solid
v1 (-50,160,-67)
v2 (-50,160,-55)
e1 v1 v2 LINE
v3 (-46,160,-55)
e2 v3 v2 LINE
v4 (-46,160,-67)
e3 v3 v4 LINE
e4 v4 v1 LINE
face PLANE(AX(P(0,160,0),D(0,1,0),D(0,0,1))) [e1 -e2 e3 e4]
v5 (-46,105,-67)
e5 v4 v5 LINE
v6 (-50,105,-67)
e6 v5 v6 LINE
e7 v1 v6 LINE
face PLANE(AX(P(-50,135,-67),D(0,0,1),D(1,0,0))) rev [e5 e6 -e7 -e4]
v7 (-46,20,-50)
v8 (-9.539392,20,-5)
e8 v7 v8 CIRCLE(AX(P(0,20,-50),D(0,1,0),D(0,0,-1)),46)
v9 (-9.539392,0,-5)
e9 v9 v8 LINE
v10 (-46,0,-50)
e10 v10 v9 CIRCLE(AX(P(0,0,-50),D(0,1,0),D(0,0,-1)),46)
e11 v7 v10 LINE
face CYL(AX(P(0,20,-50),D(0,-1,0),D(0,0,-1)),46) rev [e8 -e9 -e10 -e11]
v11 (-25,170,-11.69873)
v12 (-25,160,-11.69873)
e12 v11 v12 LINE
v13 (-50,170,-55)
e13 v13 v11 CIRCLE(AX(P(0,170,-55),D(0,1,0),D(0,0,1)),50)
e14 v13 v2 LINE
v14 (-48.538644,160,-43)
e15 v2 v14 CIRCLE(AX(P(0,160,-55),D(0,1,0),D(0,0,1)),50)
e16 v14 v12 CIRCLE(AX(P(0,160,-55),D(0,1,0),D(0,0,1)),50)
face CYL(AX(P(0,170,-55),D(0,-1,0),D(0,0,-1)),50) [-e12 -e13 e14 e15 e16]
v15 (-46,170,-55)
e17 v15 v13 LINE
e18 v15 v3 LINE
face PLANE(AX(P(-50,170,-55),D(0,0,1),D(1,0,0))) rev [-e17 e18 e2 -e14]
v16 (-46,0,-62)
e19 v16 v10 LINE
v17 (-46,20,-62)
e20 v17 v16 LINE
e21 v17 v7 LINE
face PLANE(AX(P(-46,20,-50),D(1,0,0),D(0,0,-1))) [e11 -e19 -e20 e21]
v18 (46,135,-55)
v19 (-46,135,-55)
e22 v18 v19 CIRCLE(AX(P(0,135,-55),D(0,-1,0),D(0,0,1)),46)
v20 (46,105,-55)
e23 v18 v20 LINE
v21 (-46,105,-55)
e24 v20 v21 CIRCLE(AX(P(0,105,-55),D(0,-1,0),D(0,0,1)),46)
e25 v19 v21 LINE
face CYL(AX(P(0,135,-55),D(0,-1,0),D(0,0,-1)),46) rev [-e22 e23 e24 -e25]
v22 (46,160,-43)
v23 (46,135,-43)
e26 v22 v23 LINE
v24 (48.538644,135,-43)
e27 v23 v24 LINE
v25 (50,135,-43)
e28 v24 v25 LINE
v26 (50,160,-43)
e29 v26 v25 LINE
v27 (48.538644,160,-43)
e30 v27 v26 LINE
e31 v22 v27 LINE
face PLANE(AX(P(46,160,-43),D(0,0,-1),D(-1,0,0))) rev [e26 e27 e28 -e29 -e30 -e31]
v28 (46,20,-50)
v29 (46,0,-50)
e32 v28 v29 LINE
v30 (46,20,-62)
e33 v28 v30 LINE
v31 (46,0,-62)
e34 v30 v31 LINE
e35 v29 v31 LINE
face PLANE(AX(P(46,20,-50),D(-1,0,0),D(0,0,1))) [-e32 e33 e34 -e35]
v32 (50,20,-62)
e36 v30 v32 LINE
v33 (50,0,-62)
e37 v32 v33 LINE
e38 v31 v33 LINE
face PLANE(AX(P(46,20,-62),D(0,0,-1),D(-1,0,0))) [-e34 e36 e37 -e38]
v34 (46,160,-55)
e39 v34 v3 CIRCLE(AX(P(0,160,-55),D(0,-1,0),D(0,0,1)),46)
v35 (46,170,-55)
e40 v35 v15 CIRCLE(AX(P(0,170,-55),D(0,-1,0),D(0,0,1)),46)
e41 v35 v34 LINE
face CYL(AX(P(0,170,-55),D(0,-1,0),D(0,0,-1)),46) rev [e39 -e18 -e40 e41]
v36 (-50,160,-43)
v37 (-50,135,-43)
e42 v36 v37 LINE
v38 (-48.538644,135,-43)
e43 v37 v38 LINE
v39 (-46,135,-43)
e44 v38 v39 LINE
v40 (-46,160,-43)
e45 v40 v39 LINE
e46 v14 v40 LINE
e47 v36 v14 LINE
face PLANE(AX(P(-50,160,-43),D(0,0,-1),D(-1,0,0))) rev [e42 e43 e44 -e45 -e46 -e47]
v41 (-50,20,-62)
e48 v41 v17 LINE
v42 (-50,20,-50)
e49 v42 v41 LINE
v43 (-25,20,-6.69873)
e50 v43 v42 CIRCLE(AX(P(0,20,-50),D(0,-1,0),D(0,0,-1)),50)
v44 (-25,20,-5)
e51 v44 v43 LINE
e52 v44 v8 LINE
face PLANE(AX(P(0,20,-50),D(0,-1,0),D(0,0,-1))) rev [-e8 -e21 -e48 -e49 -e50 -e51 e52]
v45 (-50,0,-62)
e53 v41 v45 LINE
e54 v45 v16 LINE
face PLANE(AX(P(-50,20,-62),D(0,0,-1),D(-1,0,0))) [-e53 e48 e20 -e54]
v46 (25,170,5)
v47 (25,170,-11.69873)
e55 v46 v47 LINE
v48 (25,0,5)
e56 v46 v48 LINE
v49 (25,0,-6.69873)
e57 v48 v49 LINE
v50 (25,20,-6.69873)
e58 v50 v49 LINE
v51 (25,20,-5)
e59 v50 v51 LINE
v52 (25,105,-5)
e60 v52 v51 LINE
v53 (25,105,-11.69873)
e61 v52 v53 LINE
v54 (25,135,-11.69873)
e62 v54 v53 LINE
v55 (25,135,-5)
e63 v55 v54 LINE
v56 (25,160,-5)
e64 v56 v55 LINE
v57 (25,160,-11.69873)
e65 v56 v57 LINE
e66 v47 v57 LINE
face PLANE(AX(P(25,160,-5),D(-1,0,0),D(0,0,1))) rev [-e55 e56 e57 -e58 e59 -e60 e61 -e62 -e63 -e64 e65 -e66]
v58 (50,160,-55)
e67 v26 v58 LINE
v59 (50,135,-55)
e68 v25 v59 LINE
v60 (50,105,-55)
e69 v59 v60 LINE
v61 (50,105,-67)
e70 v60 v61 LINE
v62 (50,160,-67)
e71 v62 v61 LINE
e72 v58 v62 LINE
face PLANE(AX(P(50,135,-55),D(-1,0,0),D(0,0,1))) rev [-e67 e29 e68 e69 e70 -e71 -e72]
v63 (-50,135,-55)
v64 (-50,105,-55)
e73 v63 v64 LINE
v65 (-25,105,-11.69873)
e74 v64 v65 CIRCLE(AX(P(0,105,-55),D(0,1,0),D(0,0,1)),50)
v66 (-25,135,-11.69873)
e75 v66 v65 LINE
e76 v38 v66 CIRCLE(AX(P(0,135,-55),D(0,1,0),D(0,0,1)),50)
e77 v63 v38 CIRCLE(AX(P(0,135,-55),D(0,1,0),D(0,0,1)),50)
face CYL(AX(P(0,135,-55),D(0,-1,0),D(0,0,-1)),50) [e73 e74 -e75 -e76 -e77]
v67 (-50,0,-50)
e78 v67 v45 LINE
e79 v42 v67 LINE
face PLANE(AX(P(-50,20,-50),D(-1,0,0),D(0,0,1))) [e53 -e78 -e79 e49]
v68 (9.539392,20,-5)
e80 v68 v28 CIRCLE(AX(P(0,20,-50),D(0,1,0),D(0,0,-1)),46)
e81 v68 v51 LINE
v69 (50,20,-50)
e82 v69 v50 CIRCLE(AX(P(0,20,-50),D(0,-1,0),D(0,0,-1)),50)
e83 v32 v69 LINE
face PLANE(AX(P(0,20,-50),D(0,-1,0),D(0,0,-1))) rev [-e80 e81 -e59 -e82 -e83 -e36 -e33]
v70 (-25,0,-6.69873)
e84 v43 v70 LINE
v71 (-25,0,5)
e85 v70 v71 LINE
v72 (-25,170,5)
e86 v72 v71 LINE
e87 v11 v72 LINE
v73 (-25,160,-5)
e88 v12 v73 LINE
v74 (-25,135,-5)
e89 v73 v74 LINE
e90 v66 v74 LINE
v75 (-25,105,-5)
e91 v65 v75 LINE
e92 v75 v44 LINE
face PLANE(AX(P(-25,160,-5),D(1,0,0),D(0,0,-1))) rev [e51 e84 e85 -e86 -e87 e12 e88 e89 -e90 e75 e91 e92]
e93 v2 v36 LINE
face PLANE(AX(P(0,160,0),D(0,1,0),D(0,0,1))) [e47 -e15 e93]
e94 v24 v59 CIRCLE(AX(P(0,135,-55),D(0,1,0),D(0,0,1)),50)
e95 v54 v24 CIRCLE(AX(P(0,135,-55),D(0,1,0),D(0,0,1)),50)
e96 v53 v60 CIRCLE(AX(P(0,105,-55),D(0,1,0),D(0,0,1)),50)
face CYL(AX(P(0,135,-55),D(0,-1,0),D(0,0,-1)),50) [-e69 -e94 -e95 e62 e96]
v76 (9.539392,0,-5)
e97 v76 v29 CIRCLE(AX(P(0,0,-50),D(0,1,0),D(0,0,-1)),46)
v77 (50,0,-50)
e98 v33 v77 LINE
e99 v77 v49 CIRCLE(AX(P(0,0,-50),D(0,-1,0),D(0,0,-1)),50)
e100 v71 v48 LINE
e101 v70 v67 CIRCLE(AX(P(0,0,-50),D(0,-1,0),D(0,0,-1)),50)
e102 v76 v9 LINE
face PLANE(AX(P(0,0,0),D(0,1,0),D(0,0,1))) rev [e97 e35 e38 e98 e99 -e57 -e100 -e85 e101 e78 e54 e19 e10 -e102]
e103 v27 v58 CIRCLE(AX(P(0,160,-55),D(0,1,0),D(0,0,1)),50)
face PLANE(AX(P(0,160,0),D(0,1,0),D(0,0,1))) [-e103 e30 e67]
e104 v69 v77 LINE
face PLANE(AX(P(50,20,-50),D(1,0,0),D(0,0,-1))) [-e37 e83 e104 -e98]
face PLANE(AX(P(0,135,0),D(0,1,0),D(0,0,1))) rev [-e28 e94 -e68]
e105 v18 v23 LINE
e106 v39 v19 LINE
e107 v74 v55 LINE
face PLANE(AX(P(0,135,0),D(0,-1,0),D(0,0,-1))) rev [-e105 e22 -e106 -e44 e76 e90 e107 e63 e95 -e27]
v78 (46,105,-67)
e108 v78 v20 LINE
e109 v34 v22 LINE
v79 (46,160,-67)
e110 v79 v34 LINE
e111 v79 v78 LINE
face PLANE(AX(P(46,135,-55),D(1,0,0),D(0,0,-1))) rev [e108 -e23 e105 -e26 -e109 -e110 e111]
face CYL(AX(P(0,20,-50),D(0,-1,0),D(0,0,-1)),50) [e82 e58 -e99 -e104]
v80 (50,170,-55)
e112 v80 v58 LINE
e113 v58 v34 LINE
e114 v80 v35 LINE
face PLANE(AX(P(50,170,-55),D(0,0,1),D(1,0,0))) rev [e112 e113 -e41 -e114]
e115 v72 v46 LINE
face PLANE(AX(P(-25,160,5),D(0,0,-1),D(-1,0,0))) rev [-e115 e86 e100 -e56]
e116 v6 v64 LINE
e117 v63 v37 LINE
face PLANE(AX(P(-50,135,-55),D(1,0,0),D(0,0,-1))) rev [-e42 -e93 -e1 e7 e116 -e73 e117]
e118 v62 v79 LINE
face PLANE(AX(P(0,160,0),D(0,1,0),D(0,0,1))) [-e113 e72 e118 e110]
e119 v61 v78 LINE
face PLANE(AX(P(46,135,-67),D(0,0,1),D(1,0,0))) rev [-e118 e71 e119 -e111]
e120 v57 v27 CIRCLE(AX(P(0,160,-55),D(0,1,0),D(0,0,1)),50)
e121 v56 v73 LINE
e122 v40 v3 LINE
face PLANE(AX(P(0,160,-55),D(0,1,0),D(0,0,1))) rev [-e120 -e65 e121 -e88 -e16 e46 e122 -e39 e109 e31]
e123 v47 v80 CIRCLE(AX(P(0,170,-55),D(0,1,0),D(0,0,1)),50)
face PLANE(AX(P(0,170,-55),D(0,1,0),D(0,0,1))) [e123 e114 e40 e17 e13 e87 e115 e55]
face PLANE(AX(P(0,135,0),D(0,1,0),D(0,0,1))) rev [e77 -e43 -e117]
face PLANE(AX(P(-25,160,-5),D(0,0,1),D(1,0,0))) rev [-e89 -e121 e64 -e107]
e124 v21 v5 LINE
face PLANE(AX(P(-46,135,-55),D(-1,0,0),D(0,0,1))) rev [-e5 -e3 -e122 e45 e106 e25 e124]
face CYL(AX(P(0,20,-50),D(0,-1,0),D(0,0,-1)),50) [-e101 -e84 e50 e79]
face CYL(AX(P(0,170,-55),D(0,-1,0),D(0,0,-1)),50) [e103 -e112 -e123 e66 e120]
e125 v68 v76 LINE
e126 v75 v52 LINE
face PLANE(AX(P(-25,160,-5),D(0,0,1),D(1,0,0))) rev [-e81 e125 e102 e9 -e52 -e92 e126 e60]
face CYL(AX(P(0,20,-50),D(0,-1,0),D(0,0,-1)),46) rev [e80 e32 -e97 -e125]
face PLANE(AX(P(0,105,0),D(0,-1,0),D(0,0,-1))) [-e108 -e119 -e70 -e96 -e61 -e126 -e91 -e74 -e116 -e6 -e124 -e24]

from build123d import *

# Parameters (mm, degrees)
SKETCH_1_W      = 50
SKETCH_1_H      = 10
EXTRUDE_1_DEPTH = 160
EXTRUDE_START   = 105
EXTRUDE_3_DEPTH = 30
EXTRUDE_9_DEPTH = 20
SKETCH_3_W      = 4
SKETCH_3_H      = 24
EXTRUDE_4_DEPTH = 25
EXTRUDE_8_DEPTH = 10


# Read off the part's stored shape, not the designer's step: 凸台-拉伸3
with BuildPart() as part:
    # 草图1 → 凸台-拉伸1 (new body)
    with BuildSketch(Plane(origin=(0, 0, 0), x_dir=(1, 0, 0), z_dir=(0, 1, 0))):
        Rectangle(SKETCH_1_W, SKETCH_1_H)
    extrude(amount=EXTRUDE_1_DEPTH)

    # 凸台-拉伸3 outline → 凸台-拉伸3 (add)
    with BuildSketch(Plane(origin=(0, 0, 0), x_dir=(1, 0, 0), z_dir=(0, 1, 0)).offset(EXTRUDE_START)):
        with BuildLine():
            Line((-25, 11.698729811), (-25, 5))
            Line((-25, 5), (25, 5))
            Line((25, 5), (25, 11.698729811))
            ThreePointArc((25, 11.698729811), (43.301270189, 30), (50, 55))
            Line((50, 55), (50, 67))
            Line((50, 67), (46, 67))
            Line((46, 67), (46, 55))
            ThreePointArc((46, 55), (0, 9), (-46, 55))
            Line((-46, 55), (-46, 67))
            Line((-46, 67), (-50, 67))
            Line((-50, 67), (-50, 55))
            ThreePointArc((-50, 55), (-43.301270189, 30), (-25, 11.698729811))
        make_face()
    extrude(amount=EXTRUDE_3_DEPTH)

    # 草图6 → 凸台-拉伸9 (add)
    with BuildSketch(Plane.XZ):
        with BuildLine():
            Line((-17.162962033, 1.601757508), (17.472067362, 1.754788629))
            Line((17.472067362, 1.754788629), (25, -5))
            Line((25, -5), (25, -6.698729811))
            ThreePointArc((25, -6.698729811), (43.301270189, -25), (50, -50))
            Line((50, -50), (50, -62))
            Line((50, -62), (46, -62))
            Line((46, -62), (46, -50))
            ThreePointArc((46, -50), (0, -4), (-46, -50))
            Line((-46, -50), (-46, -62))
            Line((-46, -62), (-50, -62))
            Line((-50, -62), (-50, -50))
            ThreePointArc((-50, -50), (-43.301270189, -25), (-25, -6.698729811))
            Line((-25, -6.698729811), (-25, -5))
            Line((-25, -5), (-17.162962033, 1.601757508))
        make_face()
    extrude(amount=-EXTRUDE_9_DEPTH)

    # 草图3 → 凸台-拉伸4 (add)
    with BuildSketch(Plane(origin=(0, 135, 0), x_dir=(1, 0, 0), z_dir=(0, 1, 0))):
        with Locations((-48, 55)):
            Rectangle(SKETCH_3_W, SKETCH_3_H)
        with Locations((48, 55)):
            Rectangle(SKETCH_3_W, SKETCH_3_H)
    extrude(amount=EXTRUDE_4_DEPTH)

    # 草图4 → 凸台-拉伸8 (add)
    with BuildSketch(Plane(origin=(0, 160, 0), x_dir=(1, 0, 0), z_dir=(0, 1, 0))):
        with BuildLine():
            Line((-50, 55), (-46, 55))
            ThreePointArc((-46, 55), (0, 9), (46, 55))
            Line((46, 55), (50, 55))
            ThreePointArc((50, 55), (43.301270189, 30), (25, 11.698729811))
            Line((25, 11.698729811), (25, -5))
            Line((25, -5), (-25, -5))
            Line((-25, -5), (-25, 11.698729811))
            ThreePointArc((-25, 11.698729811), (-43.301270189, 30), (-50, 55))
        make_face()
    extrude(amount=EXTRUDE_8_DEPTH)


solid = part.part
